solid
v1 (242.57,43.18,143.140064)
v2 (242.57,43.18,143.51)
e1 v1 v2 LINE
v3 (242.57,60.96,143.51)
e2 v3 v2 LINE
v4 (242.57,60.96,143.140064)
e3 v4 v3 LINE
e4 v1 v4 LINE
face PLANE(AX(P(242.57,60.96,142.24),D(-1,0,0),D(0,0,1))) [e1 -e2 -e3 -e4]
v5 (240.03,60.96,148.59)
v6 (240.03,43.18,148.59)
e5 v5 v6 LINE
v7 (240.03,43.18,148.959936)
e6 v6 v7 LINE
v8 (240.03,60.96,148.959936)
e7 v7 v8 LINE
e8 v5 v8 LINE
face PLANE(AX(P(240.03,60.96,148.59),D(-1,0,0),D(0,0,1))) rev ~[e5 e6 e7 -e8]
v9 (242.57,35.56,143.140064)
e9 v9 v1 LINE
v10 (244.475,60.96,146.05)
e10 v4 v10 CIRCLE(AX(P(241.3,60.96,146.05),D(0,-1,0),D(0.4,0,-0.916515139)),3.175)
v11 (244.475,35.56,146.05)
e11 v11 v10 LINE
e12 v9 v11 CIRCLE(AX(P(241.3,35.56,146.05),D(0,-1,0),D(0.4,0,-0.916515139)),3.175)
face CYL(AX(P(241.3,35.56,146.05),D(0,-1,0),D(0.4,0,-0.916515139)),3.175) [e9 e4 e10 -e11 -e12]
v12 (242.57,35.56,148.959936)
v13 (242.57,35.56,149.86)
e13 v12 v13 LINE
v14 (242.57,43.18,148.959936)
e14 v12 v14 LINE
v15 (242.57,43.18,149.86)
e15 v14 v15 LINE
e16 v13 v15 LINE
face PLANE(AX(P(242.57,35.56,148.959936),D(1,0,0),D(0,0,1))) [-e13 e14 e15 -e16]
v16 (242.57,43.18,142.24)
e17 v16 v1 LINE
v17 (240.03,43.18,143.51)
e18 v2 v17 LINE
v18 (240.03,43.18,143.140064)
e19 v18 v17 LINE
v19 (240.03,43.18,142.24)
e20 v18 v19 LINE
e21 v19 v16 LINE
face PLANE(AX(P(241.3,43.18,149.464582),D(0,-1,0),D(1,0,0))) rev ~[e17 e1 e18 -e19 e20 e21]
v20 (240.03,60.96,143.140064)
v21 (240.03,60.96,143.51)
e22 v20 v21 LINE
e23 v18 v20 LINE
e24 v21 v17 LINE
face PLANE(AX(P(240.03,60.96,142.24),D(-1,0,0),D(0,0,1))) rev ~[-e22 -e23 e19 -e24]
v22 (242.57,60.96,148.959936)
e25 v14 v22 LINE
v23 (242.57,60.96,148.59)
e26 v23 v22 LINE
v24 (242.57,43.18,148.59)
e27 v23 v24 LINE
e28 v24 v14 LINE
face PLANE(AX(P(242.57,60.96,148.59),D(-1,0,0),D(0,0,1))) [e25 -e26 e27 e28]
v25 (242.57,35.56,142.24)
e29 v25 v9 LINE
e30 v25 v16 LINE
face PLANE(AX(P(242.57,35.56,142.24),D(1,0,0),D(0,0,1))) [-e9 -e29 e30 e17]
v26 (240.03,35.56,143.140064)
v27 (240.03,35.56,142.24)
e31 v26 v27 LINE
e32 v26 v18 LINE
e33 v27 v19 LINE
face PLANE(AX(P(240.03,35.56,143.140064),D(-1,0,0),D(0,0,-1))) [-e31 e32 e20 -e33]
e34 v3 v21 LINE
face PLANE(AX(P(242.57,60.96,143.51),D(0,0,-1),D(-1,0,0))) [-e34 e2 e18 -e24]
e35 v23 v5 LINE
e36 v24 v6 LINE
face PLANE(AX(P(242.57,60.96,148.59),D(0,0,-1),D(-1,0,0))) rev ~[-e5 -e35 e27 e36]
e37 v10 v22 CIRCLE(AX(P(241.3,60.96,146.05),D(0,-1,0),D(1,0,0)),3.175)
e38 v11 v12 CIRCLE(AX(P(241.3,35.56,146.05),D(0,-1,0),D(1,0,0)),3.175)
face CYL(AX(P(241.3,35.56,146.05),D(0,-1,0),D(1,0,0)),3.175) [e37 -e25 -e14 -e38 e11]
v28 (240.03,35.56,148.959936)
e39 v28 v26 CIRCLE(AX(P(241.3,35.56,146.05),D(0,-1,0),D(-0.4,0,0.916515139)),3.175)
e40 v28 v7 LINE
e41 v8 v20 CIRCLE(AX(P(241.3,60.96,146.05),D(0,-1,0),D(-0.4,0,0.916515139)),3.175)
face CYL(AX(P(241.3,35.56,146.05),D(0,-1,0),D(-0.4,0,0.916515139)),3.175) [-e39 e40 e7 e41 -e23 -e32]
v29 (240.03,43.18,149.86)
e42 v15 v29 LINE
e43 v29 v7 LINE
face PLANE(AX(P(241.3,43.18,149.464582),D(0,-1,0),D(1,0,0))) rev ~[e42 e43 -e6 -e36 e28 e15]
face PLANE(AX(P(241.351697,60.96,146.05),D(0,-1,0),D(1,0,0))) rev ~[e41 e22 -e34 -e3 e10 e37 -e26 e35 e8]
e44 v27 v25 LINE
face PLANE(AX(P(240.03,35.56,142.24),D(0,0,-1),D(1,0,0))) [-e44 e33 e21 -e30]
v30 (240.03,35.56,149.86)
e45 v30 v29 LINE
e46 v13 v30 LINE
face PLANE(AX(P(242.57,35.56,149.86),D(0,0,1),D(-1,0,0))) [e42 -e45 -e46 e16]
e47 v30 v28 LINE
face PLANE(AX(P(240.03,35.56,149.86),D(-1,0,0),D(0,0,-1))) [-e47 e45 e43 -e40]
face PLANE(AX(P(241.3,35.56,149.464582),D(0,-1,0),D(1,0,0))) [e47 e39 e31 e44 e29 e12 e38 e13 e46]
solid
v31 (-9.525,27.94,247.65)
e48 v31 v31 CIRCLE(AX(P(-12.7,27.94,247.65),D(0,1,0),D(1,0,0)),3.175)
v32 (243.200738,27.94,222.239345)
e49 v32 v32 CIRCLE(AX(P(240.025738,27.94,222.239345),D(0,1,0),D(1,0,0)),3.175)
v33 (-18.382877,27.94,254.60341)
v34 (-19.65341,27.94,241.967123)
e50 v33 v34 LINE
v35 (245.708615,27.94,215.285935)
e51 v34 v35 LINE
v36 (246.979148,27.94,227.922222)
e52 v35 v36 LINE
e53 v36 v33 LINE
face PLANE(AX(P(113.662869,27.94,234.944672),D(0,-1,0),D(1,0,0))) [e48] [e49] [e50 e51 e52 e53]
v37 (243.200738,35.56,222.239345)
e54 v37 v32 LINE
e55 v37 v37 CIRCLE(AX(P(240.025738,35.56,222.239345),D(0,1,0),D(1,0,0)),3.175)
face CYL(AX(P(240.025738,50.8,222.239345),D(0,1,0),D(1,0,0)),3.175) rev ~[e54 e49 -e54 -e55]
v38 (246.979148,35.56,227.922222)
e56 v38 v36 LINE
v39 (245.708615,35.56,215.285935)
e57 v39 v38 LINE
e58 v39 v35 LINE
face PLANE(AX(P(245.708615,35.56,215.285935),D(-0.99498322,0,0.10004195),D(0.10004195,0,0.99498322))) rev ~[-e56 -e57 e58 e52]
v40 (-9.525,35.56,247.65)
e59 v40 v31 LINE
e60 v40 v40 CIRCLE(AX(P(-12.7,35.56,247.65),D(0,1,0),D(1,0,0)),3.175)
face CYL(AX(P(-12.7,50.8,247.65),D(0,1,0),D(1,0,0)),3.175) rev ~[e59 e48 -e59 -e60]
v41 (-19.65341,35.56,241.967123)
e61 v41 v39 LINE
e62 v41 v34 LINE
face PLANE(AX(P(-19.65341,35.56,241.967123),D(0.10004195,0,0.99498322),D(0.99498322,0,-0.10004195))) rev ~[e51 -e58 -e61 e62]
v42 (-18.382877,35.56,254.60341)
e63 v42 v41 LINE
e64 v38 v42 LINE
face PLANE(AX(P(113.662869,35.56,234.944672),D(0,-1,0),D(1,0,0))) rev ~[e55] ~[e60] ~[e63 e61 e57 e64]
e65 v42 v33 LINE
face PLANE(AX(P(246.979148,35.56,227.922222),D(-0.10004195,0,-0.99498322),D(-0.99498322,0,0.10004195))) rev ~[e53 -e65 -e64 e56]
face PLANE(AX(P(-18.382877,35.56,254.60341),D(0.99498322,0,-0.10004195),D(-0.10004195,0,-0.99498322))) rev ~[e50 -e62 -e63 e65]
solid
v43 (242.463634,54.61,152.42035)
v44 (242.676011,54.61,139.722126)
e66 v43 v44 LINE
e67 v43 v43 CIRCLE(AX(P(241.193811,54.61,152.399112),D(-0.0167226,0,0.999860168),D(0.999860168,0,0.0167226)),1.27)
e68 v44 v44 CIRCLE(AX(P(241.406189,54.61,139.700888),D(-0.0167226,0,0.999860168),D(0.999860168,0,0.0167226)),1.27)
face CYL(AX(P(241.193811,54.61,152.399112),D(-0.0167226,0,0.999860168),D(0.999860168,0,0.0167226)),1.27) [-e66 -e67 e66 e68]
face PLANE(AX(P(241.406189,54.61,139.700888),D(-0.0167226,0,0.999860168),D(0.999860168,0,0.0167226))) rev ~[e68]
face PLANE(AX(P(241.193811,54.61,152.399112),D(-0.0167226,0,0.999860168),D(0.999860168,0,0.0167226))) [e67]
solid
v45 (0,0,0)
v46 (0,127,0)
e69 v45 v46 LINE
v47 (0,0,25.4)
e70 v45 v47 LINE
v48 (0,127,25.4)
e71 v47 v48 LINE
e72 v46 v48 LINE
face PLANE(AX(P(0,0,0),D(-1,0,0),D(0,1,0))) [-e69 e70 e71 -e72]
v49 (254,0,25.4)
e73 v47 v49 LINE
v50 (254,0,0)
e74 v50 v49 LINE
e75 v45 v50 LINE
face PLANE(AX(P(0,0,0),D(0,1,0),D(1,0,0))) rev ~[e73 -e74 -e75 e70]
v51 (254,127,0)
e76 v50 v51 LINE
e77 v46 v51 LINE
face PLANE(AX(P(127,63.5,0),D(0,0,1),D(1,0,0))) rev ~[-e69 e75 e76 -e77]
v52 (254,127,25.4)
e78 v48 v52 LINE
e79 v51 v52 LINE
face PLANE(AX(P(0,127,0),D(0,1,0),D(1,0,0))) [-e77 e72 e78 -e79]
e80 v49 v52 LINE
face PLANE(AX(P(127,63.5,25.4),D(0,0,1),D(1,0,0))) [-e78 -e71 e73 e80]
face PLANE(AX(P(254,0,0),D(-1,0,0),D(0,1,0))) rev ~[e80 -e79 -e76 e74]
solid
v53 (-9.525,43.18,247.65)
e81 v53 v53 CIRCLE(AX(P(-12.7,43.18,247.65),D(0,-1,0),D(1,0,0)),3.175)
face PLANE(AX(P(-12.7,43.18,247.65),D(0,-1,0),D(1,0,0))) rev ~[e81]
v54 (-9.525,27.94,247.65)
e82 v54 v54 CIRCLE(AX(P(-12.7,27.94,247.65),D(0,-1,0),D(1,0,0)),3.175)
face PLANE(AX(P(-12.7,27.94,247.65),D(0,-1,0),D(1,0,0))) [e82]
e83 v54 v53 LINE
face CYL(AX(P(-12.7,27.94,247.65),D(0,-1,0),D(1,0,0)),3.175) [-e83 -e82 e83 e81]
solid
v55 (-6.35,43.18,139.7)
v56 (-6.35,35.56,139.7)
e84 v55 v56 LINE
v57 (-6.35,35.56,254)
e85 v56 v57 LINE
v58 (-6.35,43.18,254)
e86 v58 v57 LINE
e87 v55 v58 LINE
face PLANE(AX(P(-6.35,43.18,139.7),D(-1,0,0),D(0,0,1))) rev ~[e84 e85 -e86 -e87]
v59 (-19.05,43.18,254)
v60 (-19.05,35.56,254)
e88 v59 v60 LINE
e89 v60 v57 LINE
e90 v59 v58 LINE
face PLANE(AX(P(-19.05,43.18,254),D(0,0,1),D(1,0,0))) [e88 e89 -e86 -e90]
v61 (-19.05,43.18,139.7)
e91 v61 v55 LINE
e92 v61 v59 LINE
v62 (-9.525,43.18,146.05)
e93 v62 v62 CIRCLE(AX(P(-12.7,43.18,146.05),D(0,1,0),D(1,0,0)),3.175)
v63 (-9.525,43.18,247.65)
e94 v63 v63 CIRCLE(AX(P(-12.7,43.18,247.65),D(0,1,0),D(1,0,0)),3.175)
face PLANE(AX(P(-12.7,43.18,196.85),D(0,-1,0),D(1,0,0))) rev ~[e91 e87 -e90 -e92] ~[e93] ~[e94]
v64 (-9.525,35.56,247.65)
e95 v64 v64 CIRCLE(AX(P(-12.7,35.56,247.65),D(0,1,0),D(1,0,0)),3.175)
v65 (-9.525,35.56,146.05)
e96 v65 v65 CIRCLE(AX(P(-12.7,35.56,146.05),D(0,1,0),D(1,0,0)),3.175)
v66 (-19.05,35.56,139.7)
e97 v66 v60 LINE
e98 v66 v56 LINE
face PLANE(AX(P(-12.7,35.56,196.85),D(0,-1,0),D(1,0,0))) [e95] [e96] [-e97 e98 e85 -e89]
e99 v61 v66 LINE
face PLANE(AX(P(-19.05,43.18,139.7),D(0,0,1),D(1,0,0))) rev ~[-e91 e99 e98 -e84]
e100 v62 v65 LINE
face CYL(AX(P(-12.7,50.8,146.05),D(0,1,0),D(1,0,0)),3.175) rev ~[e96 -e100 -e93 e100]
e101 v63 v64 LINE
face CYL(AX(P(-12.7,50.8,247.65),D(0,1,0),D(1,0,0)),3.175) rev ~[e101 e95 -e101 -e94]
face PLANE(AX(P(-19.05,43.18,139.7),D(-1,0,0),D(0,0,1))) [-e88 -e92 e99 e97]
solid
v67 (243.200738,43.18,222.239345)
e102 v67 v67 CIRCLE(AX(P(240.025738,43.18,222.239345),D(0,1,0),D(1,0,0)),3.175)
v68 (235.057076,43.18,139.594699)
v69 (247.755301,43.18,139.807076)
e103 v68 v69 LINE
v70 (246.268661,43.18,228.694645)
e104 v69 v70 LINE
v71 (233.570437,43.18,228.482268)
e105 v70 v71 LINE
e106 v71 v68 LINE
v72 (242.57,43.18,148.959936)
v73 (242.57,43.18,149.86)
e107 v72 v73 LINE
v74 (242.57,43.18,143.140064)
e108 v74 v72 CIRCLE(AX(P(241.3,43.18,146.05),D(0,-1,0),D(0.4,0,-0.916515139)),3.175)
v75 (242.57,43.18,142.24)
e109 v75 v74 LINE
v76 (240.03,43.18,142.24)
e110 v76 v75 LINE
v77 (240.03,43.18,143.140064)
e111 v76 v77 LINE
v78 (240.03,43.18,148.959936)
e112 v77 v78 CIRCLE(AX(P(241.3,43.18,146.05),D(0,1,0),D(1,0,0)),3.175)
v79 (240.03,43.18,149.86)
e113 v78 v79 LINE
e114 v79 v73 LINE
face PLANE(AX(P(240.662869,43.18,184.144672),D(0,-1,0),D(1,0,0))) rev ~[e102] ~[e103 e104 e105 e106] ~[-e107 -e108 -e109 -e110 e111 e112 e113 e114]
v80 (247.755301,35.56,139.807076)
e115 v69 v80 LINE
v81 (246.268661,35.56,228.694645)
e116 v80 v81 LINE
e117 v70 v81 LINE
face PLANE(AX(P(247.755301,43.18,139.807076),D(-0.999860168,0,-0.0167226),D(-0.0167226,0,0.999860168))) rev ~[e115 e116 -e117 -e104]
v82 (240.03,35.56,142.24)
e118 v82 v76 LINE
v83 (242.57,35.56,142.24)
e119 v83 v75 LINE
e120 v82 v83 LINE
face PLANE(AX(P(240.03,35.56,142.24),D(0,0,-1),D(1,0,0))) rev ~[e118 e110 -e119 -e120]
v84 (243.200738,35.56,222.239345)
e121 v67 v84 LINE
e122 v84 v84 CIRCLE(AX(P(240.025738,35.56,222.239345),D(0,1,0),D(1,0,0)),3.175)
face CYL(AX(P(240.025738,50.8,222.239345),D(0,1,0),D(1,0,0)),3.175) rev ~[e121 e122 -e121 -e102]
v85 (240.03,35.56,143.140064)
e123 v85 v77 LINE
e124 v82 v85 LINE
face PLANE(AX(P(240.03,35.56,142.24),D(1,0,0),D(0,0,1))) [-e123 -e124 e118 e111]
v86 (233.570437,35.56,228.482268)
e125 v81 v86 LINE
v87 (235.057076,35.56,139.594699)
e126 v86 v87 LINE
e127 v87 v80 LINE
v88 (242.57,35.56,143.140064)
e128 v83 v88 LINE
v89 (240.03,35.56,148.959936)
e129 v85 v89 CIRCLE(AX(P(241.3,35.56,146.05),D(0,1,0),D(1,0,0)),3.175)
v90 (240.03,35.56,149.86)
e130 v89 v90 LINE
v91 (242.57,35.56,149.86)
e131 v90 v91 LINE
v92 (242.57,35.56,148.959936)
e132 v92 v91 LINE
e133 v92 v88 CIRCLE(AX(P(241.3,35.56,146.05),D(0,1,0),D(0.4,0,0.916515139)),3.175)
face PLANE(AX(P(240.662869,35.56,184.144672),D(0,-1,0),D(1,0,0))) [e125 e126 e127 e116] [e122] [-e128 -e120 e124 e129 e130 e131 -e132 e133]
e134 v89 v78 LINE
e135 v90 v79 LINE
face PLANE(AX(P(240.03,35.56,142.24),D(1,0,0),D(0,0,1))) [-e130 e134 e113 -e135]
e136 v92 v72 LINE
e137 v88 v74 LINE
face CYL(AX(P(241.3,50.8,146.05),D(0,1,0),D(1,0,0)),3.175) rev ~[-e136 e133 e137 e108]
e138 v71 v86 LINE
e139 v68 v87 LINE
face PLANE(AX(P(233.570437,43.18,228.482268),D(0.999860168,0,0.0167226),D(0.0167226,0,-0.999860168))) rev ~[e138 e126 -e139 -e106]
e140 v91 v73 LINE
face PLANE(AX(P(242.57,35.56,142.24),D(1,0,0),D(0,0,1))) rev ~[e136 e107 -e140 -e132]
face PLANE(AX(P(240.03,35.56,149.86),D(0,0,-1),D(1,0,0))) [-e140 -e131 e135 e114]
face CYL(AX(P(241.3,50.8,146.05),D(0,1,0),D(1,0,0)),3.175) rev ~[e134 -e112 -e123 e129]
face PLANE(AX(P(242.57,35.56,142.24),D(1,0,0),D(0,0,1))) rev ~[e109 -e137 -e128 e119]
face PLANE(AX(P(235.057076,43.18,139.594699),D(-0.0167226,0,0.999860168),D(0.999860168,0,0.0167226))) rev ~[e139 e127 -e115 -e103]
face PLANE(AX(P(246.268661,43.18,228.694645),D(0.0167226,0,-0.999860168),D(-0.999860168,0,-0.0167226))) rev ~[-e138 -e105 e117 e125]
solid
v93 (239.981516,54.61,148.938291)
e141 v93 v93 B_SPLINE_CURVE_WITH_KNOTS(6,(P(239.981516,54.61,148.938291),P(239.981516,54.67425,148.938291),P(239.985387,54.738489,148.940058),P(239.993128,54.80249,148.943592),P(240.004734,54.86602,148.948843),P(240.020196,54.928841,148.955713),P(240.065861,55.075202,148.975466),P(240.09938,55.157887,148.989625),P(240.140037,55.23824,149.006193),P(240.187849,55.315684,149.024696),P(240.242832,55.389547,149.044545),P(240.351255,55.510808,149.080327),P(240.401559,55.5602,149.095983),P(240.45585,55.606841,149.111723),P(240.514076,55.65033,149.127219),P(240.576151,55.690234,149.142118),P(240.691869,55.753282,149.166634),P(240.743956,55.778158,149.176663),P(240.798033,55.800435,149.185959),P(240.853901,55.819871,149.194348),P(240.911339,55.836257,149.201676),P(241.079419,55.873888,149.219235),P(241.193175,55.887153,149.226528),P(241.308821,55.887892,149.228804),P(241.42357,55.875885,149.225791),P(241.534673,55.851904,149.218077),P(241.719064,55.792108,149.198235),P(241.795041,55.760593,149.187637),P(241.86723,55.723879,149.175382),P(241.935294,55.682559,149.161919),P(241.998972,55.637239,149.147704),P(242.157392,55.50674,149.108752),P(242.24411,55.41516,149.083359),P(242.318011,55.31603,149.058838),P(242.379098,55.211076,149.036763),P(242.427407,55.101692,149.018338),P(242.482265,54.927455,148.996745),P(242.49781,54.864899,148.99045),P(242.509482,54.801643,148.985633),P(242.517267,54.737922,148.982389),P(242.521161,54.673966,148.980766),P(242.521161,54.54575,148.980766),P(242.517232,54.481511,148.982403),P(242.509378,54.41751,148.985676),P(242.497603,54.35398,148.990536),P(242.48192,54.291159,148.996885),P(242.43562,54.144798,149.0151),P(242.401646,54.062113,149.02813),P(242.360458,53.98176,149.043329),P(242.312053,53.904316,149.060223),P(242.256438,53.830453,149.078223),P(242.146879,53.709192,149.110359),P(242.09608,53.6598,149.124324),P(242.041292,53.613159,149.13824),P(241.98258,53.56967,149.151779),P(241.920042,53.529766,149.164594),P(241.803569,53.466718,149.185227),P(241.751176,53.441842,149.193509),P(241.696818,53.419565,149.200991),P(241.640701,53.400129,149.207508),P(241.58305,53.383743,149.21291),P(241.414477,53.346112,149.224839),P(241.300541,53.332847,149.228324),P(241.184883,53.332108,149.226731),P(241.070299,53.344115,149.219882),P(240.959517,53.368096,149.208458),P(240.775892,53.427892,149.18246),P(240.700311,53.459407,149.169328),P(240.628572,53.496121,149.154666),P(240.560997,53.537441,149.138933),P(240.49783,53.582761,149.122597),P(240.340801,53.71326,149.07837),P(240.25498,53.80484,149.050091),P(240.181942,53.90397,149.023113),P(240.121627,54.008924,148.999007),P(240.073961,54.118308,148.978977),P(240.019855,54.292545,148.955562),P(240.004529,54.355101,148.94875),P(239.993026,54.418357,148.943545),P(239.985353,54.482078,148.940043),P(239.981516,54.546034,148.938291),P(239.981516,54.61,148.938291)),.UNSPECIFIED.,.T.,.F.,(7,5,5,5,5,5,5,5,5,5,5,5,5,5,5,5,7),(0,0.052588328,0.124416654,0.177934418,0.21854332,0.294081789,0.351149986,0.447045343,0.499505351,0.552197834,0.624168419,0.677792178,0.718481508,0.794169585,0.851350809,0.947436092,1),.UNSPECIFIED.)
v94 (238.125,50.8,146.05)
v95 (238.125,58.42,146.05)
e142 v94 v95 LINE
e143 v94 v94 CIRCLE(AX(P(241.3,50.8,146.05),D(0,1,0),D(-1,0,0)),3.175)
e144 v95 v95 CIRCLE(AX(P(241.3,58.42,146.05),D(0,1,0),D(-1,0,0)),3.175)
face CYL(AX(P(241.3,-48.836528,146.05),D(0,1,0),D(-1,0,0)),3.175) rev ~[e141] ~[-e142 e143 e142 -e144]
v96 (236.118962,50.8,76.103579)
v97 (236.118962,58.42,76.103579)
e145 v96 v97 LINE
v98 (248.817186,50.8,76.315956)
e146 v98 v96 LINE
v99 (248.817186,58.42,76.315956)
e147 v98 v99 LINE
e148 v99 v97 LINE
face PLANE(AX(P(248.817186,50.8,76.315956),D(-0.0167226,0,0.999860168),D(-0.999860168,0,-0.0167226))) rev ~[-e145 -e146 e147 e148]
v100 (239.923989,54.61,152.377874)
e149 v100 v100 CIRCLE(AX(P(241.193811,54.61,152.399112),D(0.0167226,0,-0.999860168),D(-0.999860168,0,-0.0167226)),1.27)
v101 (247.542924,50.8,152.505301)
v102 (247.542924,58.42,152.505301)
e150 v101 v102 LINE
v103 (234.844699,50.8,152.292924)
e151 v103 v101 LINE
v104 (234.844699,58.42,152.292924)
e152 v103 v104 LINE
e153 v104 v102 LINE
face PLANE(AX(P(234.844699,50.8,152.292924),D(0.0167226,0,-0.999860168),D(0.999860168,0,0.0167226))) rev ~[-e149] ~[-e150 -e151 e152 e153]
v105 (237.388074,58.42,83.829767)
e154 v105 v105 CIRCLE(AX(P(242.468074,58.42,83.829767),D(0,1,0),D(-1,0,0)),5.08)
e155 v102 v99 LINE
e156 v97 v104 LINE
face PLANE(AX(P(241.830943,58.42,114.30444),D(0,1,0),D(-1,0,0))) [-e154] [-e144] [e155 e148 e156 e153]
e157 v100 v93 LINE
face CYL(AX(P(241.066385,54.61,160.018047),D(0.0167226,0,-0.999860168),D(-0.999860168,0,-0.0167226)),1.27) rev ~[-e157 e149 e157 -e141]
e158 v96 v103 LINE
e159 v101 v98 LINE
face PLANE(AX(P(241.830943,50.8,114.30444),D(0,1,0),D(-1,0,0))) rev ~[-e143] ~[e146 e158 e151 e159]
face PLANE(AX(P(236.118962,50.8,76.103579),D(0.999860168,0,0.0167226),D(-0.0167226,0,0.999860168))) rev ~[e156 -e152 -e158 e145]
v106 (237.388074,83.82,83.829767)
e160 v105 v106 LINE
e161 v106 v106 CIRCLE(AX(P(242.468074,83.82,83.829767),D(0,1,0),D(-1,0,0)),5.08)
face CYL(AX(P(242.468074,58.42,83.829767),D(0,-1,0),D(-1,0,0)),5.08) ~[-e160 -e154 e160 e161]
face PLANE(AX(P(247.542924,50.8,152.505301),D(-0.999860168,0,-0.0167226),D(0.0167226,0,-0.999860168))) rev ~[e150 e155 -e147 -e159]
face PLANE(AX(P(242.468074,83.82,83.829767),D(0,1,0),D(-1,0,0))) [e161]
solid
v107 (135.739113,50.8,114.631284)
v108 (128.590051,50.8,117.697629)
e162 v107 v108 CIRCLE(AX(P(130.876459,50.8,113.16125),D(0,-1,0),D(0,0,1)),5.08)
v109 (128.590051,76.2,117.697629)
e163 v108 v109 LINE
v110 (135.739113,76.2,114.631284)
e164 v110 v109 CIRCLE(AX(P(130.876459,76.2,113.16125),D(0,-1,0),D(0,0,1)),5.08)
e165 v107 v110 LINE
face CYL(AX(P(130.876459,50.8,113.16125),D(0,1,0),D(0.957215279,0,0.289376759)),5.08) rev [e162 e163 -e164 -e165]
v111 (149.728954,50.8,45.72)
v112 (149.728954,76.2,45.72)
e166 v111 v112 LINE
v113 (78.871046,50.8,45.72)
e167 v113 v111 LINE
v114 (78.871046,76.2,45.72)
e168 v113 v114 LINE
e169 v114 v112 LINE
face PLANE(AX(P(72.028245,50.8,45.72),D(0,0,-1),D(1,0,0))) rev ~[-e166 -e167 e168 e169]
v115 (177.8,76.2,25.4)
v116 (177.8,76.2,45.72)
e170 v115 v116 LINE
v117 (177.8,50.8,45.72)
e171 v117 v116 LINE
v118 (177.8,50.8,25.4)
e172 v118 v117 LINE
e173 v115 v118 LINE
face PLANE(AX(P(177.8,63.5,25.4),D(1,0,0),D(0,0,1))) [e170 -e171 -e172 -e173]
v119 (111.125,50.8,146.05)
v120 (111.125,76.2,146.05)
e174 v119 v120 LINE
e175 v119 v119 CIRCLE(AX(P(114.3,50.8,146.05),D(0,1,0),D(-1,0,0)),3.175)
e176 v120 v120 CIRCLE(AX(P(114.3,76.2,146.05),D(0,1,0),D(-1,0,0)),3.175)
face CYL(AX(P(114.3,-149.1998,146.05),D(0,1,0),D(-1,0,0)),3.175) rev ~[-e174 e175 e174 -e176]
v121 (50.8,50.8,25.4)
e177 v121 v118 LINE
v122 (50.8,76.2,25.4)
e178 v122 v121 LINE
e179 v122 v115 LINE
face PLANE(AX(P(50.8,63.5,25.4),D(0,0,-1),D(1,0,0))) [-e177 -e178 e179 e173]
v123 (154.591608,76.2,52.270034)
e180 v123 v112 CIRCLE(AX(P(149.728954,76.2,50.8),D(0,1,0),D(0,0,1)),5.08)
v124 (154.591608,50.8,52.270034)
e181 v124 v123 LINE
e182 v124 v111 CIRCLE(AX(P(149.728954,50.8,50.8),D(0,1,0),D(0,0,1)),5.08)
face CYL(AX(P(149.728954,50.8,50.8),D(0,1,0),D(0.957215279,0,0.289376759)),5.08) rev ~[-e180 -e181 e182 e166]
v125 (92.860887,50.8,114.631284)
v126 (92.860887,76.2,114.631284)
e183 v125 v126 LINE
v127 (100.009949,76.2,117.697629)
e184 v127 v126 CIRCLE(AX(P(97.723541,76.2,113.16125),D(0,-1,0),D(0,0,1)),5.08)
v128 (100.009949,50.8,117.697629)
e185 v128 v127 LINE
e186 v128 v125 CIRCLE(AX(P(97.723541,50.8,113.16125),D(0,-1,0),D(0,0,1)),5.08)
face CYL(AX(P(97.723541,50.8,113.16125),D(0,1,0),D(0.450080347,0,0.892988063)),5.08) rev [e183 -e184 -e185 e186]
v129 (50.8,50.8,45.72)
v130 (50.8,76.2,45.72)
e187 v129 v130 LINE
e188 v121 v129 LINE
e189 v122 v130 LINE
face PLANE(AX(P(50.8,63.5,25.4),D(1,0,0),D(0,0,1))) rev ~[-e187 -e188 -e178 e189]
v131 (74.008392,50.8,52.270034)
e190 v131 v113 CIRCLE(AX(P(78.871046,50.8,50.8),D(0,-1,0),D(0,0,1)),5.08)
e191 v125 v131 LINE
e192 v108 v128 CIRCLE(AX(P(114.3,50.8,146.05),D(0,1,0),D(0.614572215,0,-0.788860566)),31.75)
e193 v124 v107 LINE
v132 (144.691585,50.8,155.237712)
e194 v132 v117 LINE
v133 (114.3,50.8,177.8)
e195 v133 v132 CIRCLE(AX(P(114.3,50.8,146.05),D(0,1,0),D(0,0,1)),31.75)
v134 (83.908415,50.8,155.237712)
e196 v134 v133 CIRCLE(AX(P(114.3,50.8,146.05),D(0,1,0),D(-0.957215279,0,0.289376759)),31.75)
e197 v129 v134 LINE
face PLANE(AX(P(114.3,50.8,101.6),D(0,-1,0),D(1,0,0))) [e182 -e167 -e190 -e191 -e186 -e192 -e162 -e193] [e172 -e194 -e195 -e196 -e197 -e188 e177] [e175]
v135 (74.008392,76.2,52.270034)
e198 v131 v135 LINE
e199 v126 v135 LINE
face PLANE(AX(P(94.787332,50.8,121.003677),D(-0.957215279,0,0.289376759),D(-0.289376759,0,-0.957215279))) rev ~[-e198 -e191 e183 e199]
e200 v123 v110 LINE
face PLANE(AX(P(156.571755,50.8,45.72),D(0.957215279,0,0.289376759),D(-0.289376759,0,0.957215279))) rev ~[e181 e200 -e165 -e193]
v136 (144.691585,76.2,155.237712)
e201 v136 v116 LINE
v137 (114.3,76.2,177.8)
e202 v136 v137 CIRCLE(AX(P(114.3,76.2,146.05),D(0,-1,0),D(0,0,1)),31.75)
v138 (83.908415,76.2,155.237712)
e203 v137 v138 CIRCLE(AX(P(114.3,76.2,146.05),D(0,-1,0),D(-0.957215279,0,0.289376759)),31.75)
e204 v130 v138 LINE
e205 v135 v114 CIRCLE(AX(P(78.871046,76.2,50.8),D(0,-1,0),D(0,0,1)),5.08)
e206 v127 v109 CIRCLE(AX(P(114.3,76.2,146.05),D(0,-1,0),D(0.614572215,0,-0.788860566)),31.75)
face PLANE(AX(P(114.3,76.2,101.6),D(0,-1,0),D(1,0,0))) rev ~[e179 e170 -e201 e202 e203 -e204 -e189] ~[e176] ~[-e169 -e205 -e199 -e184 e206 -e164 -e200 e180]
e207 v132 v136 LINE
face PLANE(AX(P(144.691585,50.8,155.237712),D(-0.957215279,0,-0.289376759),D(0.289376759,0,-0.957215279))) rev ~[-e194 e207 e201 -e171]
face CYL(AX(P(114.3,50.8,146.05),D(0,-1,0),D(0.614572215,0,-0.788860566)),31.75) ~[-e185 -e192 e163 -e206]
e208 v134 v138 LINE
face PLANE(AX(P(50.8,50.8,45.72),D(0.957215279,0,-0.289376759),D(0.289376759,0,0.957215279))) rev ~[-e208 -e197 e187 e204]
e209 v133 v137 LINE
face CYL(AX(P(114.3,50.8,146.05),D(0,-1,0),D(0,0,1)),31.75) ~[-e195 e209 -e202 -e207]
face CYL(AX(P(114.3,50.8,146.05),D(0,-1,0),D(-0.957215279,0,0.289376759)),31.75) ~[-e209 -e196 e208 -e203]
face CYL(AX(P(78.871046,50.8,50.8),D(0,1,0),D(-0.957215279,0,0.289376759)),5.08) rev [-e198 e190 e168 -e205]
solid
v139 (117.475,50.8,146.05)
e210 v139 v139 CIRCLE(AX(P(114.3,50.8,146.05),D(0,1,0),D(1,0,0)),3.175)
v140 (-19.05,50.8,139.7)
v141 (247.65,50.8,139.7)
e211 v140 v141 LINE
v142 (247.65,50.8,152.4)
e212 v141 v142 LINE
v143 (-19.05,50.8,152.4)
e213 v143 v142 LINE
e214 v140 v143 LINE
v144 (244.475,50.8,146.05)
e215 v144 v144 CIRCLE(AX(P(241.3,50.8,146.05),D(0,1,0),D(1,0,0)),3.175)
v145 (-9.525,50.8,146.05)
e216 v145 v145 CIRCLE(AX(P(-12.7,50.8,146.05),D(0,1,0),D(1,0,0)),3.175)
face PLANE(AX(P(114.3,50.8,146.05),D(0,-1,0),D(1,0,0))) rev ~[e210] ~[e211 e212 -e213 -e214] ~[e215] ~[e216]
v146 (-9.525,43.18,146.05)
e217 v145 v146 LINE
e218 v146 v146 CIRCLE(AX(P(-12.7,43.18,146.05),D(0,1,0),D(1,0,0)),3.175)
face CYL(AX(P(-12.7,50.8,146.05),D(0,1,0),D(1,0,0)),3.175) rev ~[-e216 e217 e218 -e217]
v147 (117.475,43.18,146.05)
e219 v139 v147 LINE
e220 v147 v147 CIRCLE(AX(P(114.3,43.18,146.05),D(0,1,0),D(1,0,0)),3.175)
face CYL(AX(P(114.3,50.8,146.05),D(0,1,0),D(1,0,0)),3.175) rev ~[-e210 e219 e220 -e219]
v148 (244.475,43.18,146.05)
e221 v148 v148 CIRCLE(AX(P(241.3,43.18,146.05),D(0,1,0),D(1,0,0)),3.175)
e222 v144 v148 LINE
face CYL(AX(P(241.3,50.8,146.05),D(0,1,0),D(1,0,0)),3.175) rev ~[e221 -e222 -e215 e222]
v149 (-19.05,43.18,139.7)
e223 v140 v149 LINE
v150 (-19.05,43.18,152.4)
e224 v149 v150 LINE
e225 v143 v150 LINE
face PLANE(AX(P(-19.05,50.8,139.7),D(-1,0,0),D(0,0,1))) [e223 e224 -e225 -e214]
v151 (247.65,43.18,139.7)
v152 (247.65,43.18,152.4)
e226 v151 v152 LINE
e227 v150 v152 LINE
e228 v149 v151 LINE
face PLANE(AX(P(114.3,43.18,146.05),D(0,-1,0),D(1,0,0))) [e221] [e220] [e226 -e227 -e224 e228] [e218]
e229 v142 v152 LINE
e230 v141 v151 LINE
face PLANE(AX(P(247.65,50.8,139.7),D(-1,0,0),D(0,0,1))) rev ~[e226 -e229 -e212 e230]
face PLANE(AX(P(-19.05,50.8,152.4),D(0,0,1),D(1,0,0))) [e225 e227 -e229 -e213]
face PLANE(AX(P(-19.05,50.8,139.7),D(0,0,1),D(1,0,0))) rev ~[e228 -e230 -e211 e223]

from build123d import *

# Parameters (mm, degrees)
F0_W        = 254
F0_H        = 127
F1_DEPTH    = 25.4
F3_W        = 127
F3_H        = 152.4
F4_DEPTH    = 12.7
F6_DEPTH    = 76.201
F7_R        = 5.08
F9_W        = 266.7
F9_H        = 12.7
F10_DEPTH   = 7.62
F11_W       = 12.7
F11_H       = 114.3
F12_DEPTH   = 7.62
F14_DEPTH   = 7.62
F16_DEPTH   = 7.62
F17_D       = 6.35
F17_DEPTH   = 22.861
F17_2_D     = 6.35
F17_2_DEPTH = 22.861
F17_3_D     = 6.35
F17_3_DEPTH = 22.861
F17_4_D     = 6.35
F17_4_DEPTH = 22.861
F18_D       = 6.35
F21_DEPTH   = 7.62
F22_R       = 5.08
F23_DEPTH   = 25.4
F24_R       = 3.175
F25_DEPTH   = 15.24
F26_D       = 6.35
F27_W       = 2.54
F27_H       = 7.62
F28_DEPTH   = 91.441
F30_DEPTH   = 25.4
F31_DEPTH   = 7.62
F32_W       = 2.54
F32_H       = 1.27
F33_DEPTH   = 17.78
F35_D       = 2.54
F35_DEPTH   = 7.62
F35_TIP     = 0.7630929862
F36_R       = 1.27
F37_DEPTH   = 12.7


with BuildPart() as f1:
    # F0 (on Top) → F1 (new body)
    with BuildSketch(Plane.XY):
        with Locations((127, 63.5)):
            Rectangle(F0_W, F0_H)
    extrude(amount=F1_DEPTH)


with BuildPart() as f4:
    # F3 (on mid) → F4 (new body, symmetric)
    with BuildSketch(Plane.XZ.offset(-63.5)):
        with Locations((114.3, 101.6)):
            Rectangle(F3_W, F3_H)
    extrude(amount=F4_DEPTH, both=True)

    # F5 (on face) → F6 (cut, through all)
    with BuildSketch(Plane.XZ.offset(-50.8)):
        with BuildLine():
            Line((156.5717554914, 45.72), (133.8126678121, 121.0036770193))
            ThreePointArc((133.8126678121, 121.0036770193), (114.3, 114.3), (94.7873321879, 121.0036770193))
            Line((94.7873321879, 121.0036770193), (72.0282445086, 45.72))
            Line((72.0282445086, 45.72), (156.5717554914, 45.72))
        make_face()
        with BuildLine():
            ThreePointArc((83.9084148767, 155.2377121033), (95.3744532349, 171.5428652693), (114.3, 177.8))
            Line((114.3, 177.8), (50.8, 177.8))
            Line((50.8, 177.8), (50.8, 45.72))
            Line((50.8, 45.72), (83.9084148767, 155.2377121033))
        make_face()
        with BuildLine():
            ThreePointArc((114.3, 177.8), (133.2255467651, 171.5428652693), (144.6915851233, 155.2377121033))
            Line((144.6915851233, 155.2377121033), (177.8, 45.72))
            Line((177.8, 45.72), (177.8, 177.8))
            Line((177.8, 177.8), (114.3, 177.8))
        make_face()
    extrude(amount=-F6_DEPTH, mode=Mode.SUBTRACT)

    # F7
    f7_edges = [f4.edges().sort_by_distance(p)[0] for p in [
        (72.028245, 63.5, 45.72),
        (156.571755, 63.5, 45.72),
        (94.787332, 63.5, 121.003677),
        (133.812668, 63.5, 121.003677),
    ]]
    fillet(f7_edges, radius=F7_R)

    # F18 (through all)
    with Locations(Plane.XZ.offset(-50.8)):
        with Locations((114.3, 146.05)):
            Hole(F18_D / 2)


with BuildPart() as f10:
    # F9 (on face) → F10 (new body)
    with BuildSketch(Plane.XZ.offset(-50.8)):
        with Locations((114.3, 146.05)):
            Rectangle(F9_W, F9_H)
    extrude(amount=F10_DEPTH)

    # F17 (through all, one way)
    with BuildSketch(Plane(origin=(0, 50.8, 0), x_dir=(1, 0, 0), z_dir=(0, 1, 0))):
        with Locations((-12.7, -247.65), (-12.7, -146.05), (114.3, -146.05), (241.3, -146.05), (240.025737907, -222.2393447676)):
            Circle(F17_D / 2)
    extrude(amount=-F17_DEPTH, mode=Mode.SUBTRACT)


with BuildPart() as f12:
    # F11 (on face) → F12 (new body)
    with BuildSketch(Plane.XZ.offset(-43.18)):
        with Locations((-12.7, 196.85)):
            Rectangle(F11_W, F11_H)
    extrude(amount=F12_DEPTH)

    # F17#2 (through all, one way)
    with BuildSketch(Plane(origin=(0, 50.8, 0), x_dir=(1, 0, 0), z_dir=(0, 1, 0))):
        with Locations((-12.7, -247.65), (-12.7, -146.05), (114.3, -146.05), (241.3, -146.05), (240.025737907, -222.2393447676)):
            Circle(F17_2_D / 2)
    extrude(amount=-F17_2_DEPTH, mode=Mode.SUBTRACT)


with BuildPart() as f14:
    # F13 (on face) → F14 (new body)
    with BuildSketch(Plane.XZ.offset(-35.56)):
        Polygon((-19.6534098285, 241.9671229331), (245.7086149739, 215.2859349391), (246.9791477355, 227.9222218345), (-18.3828770669, 254.6034098285), align=None)
    extrude(amount=F14_DEPTH)

    # F17#3 (through all, one way)
    with BuildSketch(Plane(origin=(0, 50.8, 0), x_dir=(1, 0, 0), z_dir=(0, 1, 0))):
        with Locations((-12.7, -247.65), (-12.7, -146.05), (114.3, -146.05), (241.3, -146.05), (240.025737907, -222.2393447676)):
            Circle(F17_3_D / 2)
    extrude(amount=-F17_3_DEPTH, mode=Mode.SUBTRACT)


with BuildPart() as f16:
    # F15 (on face) → F16 (new body)
    with BuildSketch(Plane.XZ.offset(-43.18)):
        Polygon((247.7553005717, 139.8070764438), (246.2686614633, 228.6946453393), (233.5704373353, 228.4822683238), (235.0570764438, 139.5946994283), align=None)
    extrude(amount=F16_DEPTH)

    # F17#4 (through all, one way)
    with BuildSketch(Plane(origin=(0, 50.8, 0), x_dir=(1, 0, 0), z_dir=(0, 1, 0))):
        with Locations((-12.7, -247.65), (-12.7, -146.05), (114.3, -146.05), (241.3, -146.05), (240.025737907, -222.2393447676)):
            Circle(F17_4_D / 2)
    extrude(amount=-F17_4_DEPTH, mode=Mode.SUBTRACT)

    # F27 (on face) → F28 (cut, through all)
    with BuildSketch(Plane.XZ.offset(-35.56)):
        with Locations((241.3, 146.05)):
            Rectangle(F27_W, F27_H)
    extrude(amount=-F28_DEPTH, mode=Mode.SUBTRACT)


with BuildPart() as f21:
    # F20 (on face) → F21 (new body)
    with BuildSketch(Plane(origin=(0, 50.8, 0), x_dir=(-1, 0, 0), z_dir=(0, 1, 0))):
        Polygon((-248.8171856492, 76.3159558041), (-236.1189615212, 76.1035787886), (-234.8446994283, 152.2929235562), (-247.5429235562, 152.5053005717), align=None)
    extrude(amount=F21_DEPTH)

    # F22 (on face) → F23 (join)
    with BuildSketch(Plane(origin=(0, 58.42, 0), x_dir=(-1, 0, 0), z_dir=(0, 1, 0))):
        with Locations((-242.4680735852, 83.8297672964)):
            Circle(F22_R)
    extrude(amount=F23_DEPTH)

    # F26 (through all)
    with Locations(Plane.XZ.offset(-35.56)):
        with Locations((241.3, 146.05)):
            Hole(F26_D / 2)

    # F35
    with Locations(Plane(origin=(-2.4807042479, 0, 148.3236708146), x_dir=(0.9998601676, 0, 0.0167225996), z_dir=(-0.0167225996, 0, 0.9998601676))):
        with Locations((243.7085941089, 54.61)):
            Hole(F35_D / 2, depth=F35_DEPTH)
            with Locations((0, 0, -(F35_DEPTH + F35_TIP / 2))):  # 118° drill point
                Cone(0, F35_D / 2, F35_TIP, mode=Mode.SUBTRACT)


with BuildPart() as f25:
    # F24 (on face) → F25 (new body)
    with BuildSketch(Plane.XZ.offset(-27.94)):
        with Locations((-12.7, 247.65)):
            Circle(F24_R)
    extrude(amount=-F25_DEPTH)


with BuildPart() as f30:
    # F29 (on face) → F30 (new body)
    with BuildSketch(Plane.XZ.offset(-35.56)):
        with BuildLine():
            ThreePointArc((244.475, 146.05), (243.9563955842, 147.7890191201), (242.57, 148.9599355663))
            ThreePointArc((242.57, 148.9599355663), (241.3, 149.225), (240.03, 148.9599355663))
            ThreePointArc((240.03, 148.9599355663), (238.125, 146.05), (240.03, 143.1400644337))
            ThreePointArc((240.03, 143.1400644337), (241.3, 142.875), (242.57, 143.1400644337))
            ThreePointArc((242.57, 143.1400644337), (243.9563955842, 144.3109808799), (244.475, 146.05))
        make_face()
    extrude(amount=-F30_DEPTH)

    # F29 (on face) → F31 (join)
    with BuildSketch(Plane.XZ.offset(-35.56)):
        with BuildLine():
            Line((242.57, 148.9599355663), (242.57, 149.86))
            Line((242.57, 149.86), (240.03, 149.86))
            Line((240.03, 149.86), (240.03, 148.9599355663))
            ThreePointArc((240.03, 148.9599355663), (241.3, 149.225), (242.57, 148.9599355663))
        make_face()
        with BuildLine():
            ThreePointArc((244.475, 146.05), (243.9563955842, 147.7890191201), (242.57, 148.9599355663))
            ThreePointArc((242.57, 148.9599355663), (241.3, 149.225), (240.03, 148.9599355663))
            ThreePointArc((240.03, 148.9599355663), (238.125, 146.05), (240.03, 143.1400644337))
            ThreePointArc((240.03, 143.1400644337), (241.3, 142.875), (242.57, 143.1400644337))
            ThreePointArc((242.57, 143.1400644337), (243.9563955842, 144.3109808799), (244.475, 146.05))
        make_face()
        with BuildLine():
            ThreePointArc((242.57, 143.1400644337), (241.3, 142.875), (240.03, 143.1400644337))
            Line((240.03, 143.1400644337), (240.03, 142.24))
            Line((240.03, 142.24), (242.57, 142.24))
            Line((242.57, 142.24), (242.57, 143.1400644337))
        make_face()
    extrude(amount=-F31_DEPTH)

    # F32 (on face) → F33 (cut, through all)
    with BuildSketch(Plane(origin=(0, 60.96, 0), x_dir=(-1, 0, 0), z_dir=(0, 1, 0))):
        with Locations((-241.3, 149.225)):
            Rectangle(F32_W, F32_H)
        with Locations((-241.3, 142.875)):
            Rectangle(F32_W, F32_H)
    extrude(amount=-F33_DEPTH, mode=Mode.SUBTRACT)


with BuildPart() as f37:
    # F36 (on face) → F37 (new body)
    with BuildSketch(Plane(origin=(-2.4807042479, 0, 148.3236708146), x_dir=(0.9998601676, 0, 0.0167225996), z_dir=(-0.0167225996, 0, 0.9998601676))):
        with Locations((243.7085941089, 54.61)):
            Circle(F36_R)
    extrude(amount=-F37_DEPTH)


solid = Compound([f1.part, f4.part, f10.part, f12.part, f14.part, f16.part, f21.part, f25.part, f30.part, f37.part])
